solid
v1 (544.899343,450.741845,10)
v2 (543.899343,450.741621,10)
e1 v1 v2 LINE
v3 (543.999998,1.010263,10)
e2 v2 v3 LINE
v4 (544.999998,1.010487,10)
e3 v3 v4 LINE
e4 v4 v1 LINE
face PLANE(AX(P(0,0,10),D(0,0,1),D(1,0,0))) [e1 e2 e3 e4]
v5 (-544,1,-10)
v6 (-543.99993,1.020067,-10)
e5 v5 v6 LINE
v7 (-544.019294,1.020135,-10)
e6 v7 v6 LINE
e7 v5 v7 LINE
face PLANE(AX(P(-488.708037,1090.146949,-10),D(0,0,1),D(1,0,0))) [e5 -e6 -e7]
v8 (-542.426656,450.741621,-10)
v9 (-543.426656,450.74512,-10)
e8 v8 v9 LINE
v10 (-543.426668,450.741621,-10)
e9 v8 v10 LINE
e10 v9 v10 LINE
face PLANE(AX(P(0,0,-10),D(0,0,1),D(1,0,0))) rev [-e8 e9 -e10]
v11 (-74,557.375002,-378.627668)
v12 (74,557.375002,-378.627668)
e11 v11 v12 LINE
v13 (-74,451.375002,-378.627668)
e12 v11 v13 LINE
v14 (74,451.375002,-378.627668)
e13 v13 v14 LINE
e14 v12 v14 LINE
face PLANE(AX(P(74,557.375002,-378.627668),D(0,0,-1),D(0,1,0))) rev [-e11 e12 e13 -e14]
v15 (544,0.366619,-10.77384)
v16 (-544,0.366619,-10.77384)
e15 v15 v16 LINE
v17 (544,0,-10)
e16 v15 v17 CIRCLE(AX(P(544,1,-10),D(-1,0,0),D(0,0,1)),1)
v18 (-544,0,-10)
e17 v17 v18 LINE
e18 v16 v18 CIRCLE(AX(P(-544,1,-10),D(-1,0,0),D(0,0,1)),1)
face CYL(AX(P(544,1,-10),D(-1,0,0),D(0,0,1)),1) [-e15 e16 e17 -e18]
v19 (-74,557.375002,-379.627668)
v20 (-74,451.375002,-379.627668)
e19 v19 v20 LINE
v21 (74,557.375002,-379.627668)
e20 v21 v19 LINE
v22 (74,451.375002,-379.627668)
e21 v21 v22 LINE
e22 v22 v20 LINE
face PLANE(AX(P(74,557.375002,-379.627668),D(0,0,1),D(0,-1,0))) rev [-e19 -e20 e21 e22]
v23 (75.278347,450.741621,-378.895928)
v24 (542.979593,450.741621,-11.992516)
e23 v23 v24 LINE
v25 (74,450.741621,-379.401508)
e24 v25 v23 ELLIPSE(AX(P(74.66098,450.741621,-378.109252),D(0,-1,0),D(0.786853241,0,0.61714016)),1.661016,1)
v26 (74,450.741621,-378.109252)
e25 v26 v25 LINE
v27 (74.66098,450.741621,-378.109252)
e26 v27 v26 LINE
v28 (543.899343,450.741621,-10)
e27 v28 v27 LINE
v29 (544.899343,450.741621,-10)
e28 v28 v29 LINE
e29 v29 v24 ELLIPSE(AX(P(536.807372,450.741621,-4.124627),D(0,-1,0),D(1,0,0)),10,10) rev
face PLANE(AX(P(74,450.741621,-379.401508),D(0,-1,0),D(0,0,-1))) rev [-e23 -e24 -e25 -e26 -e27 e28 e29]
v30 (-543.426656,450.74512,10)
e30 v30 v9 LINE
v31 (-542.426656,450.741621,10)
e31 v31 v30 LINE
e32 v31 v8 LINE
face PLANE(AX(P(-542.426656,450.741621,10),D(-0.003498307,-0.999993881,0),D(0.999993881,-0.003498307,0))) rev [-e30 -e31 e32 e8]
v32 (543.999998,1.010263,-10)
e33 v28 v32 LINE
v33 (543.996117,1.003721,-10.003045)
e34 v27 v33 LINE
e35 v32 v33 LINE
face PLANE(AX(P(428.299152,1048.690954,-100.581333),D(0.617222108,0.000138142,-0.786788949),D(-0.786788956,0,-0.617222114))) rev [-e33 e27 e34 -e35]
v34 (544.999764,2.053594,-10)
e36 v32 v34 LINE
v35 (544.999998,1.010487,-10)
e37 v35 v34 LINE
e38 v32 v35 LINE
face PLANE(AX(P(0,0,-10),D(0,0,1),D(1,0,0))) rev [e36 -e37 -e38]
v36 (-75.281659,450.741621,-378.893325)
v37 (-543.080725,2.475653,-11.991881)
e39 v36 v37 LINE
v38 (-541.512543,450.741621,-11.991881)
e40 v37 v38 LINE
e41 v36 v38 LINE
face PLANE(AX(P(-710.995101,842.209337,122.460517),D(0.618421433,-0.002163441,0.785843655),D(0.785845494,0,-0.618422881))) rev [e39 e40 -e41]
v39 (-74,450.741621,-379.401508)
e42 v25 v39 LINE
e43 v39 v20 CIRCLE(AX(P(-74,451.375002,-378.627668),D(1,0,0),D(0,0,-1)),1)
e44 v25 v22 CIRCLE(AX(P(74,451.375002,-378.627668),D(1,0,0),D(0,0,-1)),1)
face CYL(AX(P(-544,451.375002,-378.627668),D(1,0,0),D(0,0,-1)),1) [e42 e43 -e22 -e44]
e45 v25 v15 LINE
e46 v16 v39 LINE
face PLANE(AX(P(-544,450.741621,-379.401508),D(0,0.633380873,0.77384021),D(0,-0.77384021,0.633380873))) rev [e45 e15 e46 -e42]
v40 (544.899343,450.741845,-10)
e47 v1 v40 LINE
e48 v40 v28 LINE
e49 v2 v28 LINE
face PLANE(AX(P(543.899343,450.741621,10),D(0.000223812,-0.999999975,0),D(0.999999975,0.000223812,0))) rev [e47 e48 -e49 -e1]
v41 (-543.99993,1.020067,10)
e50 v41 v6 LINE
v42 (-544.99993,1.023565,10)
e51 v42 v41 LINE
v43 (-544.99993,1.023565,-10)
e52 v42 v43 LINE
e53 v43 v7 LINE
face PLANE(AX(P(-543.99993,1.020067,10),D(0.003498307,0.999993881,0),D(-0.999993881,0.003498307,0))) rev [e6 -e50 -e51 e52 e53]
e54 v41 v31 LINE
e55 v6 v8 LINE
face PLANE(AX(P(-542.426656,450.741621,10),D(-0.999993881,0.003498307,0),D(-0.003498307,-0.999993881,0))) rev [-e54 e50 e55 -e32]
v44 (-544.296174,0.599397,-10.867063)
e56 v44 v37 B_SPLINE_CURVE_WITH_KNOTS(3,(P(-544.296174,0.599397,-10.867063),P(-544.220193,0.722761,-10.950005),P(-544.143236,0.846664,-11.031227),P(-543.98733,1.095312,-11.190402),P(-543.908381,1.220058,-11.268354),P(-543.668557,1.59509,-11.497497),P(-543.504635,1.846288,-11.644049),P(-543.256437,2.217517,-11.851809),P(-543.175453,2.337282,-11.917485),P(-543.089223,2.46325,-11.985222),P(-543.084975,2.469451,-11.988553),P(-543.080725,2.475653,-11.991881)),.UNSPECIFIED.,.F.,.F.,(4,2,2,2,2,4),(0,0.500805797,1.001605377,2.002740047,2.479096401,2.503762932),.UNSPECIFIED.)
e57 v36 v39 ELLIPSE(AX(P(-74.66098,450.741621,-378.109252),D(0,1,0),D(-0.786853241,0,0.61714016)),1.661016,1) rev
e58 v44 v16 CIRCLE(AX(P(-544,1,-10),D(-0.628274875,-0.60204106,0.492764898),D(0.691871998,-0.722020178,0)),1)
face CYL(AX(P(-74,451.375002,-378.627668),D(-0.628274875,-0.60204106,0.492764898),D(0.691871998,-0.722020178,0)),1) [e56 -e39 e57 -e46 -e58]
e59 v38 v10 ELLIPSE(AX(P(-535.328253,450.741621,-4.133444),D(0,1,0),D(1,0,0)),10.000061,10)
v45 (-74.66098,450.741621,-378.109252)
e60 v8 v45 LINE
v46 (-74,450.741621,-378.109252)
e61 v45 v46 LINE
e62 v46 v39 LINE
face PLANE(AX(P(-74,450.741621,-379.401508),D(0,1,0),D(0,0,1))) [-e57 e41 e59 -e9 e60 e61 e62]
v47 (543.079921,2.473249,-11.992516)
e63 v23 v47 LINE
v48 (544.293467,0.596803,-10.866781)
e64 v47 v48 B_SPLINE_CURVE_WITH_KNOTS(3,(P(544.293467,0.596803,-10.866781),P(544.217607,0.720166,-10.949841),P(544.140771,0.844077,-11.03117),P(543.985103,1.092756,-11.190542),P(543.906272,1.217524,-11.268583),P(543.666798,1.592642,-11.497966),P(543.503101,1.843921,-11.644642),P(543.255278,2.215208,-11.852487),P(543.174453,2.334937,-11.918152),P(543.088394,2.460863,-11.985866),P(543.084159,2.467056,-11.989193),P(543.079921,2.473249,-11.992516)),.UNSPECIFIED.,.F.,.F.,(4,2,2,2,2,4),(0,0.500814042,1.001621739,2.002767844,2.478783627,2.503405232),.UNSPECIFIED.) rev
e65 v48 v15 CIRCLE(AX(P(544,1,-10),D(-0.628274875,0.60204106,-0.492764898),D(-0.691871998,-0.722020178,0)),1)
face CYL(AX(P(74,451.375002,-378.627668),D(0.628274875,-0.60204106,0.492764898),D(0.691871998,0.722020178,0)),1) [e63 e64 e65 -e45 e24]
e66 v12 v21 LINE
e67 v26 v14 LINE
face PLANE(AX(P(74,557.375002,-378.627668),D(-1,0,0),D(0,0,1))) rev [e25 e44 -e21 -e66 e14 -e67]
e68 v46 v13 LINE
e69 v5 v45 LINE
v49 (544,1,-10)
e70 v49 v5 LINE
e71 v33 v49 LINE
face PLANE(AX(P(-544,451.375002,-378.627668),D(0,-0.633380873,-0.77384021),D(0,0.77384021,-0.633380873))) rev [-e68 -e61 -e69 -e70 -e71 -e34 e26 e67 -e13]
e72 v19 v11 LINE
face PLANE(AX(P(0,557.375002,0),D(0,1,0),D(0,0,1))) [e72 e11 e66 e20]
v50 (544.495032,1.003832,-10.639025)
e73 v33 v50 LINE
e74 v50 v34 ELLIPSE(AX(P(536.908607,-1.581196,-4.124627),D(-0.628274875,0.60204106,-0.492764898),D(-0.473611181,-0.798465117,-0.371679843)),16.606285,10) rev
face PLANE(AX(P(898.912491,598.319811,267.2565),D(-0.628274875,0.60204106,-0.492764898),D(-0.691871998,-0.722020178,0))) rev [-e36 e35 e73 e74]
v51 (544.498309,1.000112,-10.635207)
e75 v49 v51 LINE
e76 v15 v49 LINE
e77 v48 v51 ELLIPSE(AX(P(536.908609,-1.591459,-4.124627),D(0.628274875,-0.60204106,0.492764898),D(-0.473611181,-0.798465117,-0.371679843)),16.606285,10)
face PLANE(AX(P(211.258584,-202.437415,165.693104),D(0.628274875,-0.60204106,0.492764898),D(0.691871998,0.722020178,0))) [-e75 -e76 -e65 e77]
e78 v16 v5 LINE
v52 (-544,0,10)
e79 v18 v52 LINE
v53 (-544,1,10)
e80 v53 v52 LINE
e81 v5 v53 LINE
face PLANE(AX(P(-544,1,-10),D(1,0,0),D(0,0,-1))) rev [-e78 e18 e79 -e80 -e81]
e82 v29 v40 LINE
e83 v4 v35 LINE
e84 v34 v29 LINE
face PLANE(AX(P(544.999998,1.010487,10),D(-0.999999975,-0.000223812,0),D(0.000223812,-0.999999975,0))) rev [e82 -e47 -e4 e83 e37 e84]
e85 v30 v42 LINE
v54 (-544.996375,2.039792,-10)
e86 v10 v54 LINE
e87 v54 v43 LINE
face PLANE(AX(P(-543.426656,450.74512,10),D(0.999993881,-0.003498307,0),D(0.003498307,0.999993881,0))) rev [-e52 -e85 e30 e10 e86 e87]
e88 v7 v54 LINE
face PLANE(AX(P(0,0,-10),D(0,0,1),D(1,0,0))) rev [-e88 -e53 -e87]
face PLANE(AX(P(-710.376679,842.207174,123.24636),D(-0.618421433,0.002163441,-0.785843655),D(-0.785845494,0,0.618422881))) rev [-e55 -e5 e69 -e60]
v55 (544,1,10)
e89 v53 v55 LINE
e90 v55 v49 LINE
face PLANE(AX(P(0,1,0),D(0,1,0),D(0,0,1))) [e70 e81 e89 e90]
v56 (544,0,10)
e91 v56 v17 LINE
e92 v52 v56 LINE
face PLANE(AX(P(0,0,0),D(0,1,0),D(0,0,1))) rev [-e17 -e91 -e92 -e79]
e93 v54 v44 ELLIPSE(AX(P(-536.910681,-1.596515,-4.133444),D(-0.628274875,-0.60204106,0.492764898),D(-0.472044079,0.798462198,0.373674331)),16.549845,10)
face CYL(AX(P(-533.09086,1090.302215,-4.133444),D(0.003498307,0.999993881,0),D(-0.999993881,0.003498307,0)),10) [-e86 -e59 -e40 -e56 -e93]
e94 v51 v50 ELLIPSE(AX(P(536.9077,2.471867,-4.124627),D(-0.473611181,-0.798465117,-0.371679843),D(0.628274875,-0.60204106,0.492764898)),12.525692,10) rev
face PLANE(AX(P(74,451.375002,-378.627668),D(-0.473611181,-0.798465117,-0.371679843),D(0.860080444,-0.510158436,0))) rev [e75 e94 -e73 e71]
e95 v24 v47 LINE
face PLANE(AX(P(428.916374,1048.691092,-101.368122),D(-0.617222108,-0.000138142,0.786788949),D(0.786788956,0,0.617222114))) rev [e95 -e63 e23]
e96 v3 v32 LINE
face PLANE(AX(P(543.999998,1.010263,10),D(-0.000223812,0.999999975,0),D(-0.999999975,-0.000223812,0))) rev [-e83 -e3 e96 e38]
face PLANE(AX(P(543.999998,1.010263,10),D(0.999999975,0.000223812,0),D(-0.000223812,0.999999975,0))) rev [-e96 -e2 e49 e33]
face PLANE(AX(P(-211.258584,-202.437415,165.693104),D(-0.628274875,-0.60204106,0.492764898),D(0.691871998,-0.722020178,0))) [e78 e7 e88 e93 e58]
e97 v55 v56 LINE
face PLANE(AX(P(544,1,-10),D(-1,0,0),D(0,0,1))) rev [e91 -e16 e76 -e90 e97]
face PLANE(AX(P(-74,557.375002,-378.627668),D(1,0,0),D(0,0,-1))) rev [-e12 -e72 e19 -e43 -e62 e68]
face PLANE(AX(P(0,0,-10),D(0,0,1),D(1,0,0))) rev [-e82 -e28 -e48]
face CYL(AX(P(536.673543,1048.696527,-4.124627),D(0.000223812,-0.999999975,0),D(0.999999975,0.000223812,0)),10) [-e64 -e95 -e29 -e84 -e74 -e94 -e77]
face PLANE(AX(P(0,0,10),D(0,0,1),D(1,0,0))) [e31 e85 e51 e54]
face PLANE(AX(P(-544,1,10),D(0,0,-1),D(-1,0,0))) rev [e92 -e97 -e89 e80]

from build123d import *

# Parameters (mm, degrees)
SKETCH1_W               = 1088
SKETCH1_H               = 20
BOSS_EXTRUDE1_DEPTH     = 1
BOSS_EXTRUDE4_DEPTH     = 1088
SKETCH5_W               = 1088
SKETCH5_H               = 1
BOSS_EXTRUDE5_DEPTH     = 582
BOSS_EXTRUDE6_DEPTH     = 1088
SKETCH7_W               = 148
SKETCH7_H               = 1
BOSS_EXTRUDE7_DEPTH     = 106
CUT_EXTRUDE3_DEPTH      = 148
SKETCH13_W              = 470
SKETCH13_H              = 1
CUT_REVOLVE1_ANGLE      = 39.3
BOSS_EXTRUDE11_DEPTH    = 748.0802096
BOSS_EXTRUDE12_DEPTH    = 800
SKETCH18_W              = 570.021392147
SKETCH18_H              = 387.152750426
CUT_EXTRUDE5_DEPTH      = 1477.790454702
CUT_EXTRUDE6_DEPTH      = 800
CUT_EXTRUDE6_DEPTH_BACK = 10
BOSS_EXTRUDE13_DEPTH    = 748.0802096
BOSS_EXTRUDE14_DEPTH    = 748.0802096
SKETCH21_W              = 476.858853826
SKETCH21_H              = 325.647229621
CUT_EXTRUDE7_DEPTH      = 1432.718358443
CUT_EXTRUDE9_DEPTH      = 10
CUT_EXTRUDE9_DEPTH_BACK = 946.037072047
BOSS_EXTRUDE15_DEPTH    = 20
FILLET1_R               = 10
BOSS_EXTRUDE20_DEPTH    = 20
FILLET2_R               = 10


with BuildPart() as part:
    # Sketch1 → Boss-Extrude1 (new body)
    with BuildSketch(Plane(origin=(0, 0, 0), x_dir=(1, 0, 0), z_dir=(0, 1, 0))):
        Rectangle(SKETCH1_W, SKETCH1_H)
    extrude(amount=BOSS_EXTRUDE1_DEPTH)

    # Sketch4 → Boss-Extrude4 (add)
    with BuildSketch(Plane.ZY.offset(544)):
        with BuildLine():
            Line((-10, 1), (-10.77384021, 0.366619127))
            ThreePointArc((-10.77384021, 0.366619127), (-10.428146661, 0.096290735), (-10, 0))
            Line((-10, 0), (-10, 1))
        make_face()
    extrude(amount=-BOSS_EXTRUDE4_DEPTH)

    # Sketch5 → Boss-Extrude5 (add)
    with BuildSketch(Plane(origin=(0, 5.500184543, -4.501848885), x_dir=(1, 0, 0), z_dir=(0, 0.7738402097265025, -0.6333808726275548))):
        with Locations((0, 7.605021225)):
            Rectangle(SKETCH5_W, SKETCH5_H)
    extrude(amount=BOSS_EXTRUDE5_DEPTH)

    # Sketch6 → Boss-Extrude6 (add)
    with BuildSketch(Plane(origin=(544, 0, 0), x_dir=(0, 0, -1), z_dir=(1, 0, 0))):
        with BuildLine():
            Line((378.627667869, 451.375002061), (379.627667869, 451.375002061))
            ThreePointArc((379.627667869, 451.375002061), (379.569432227, 451.038728519), (379.401508079, 450.741621188))
            Line((379.401508079, 450.741621188), (378.627667869, 451.375002061))
        make_face()
    extrude(amount=-BOSS_EXTRUDE6_DEPTH)

    # Sketch7 → Boss-Extrude7 (add)
    with BuildSketch(Plane(origin=(0, 451.375002061, 0), x_dir=(1, 0, 0), z_dir=(0, 1, 0))):
        with Locations((0, 379.127667869)):
            Rectangle(SKETCH7_W, SKETCH7_H)
    extrude(amount=BOSS_EXTRUDE7_DEPTH)

    # Sketch8 → Cut-Extrude3 (cut)
    with BuildSketch(Plane(origin=(0, -4.500184543, -5.498151115), x_dir=(1, 0, 0), z_dir=(0, 0.6333808726275547, 0.7738402097265025))):
        Polygon((74, 589.107648936), (544, 7.107648936), (544, 589.107648936), align=None)
        Polygon((-74, 589.107648936), (-544, 7.107648936), (-544, 589.107648936), align=None)
    extrude(amount=-CUT_EXTRUDE3_DEPTH, mode=Mode.SUBTRACT)

    # Sketch13 → Cut-Revolve1 (revolve, cut)
    with BuildSketch(Plane(origin=(0, 451.375002061, 0), x_dir=(1, 0, 0), z_dir=(0, 1, 0))):
        with Locations((309, 379.127667869)):
            Rectangle(SKETCH13_W, SKETCH13_H)
        with Locations((-309, 379.127667869)):
            Rectangle(SKETCH13_W, SKETCH13_H)
    revolve(axis=Axis((-544, 451.375002061, -378.627667869), (-1, 0, 0)), revolution_arc=CUT_REVOLVE1_ANGLE, mode=Mode.SUBTRACT)

    # 3DSketch8 → Boss-Extrude11 (add)
    with BuildSketch(Plane(origin=(-74, 450.741621188, -379.401508079), x_dir=(0, 0.6333808726023494, 0.7738402097471327), z_dir=(-0.6282748747614416, -0.602041059623436, 0.49276489756372194))):
        with BuildLine():
            Line((0, 0), (1, 0))
            Line((1, 0), (0.393252863, 0.794894906))
            ThreePointArc((0.393252863, 0.794894906), (0.103688911, 0.443425791), (0, 0))
        make_face()
    extrude(amount=BOSS_EXTRUDE11_DEPTH)

    # Sketch17 → Boss-Extrude12 (add)
    with BuildSketch(Plane(origin=(-119.830134924, 202.692581564, 94.858610661), x_dir=(0.8810391406721232, 0.4420570737301439, 0.16839114041085765), z_dir=(-0.4720440788324485, 0.7984621982715473, 0.37367433089602736))):
        Polygon((69.885181219, 532.84001368), (70.561407095, 532.10331933), (70.579071373, 532.119533725), (69.90284514, 532.856227747), align=None)
        Polygon((-481.203373087, 26.984765587), (-480.527146854, 26.248071566), (70.561407095, 532.10331933), (69.885181219, 532.84001368), align=None)
    extrude(amount=BOSS_EXTRUDE12_DEPTH)

    # Sketch18 → Cut-Extrude5 (cut, through all)
    with BuildSketch(Plane(origin=(0, 1, 0), x_dir=(1, 0, 0), z_dir=(0, 1, 0))):
        with Locations((-773.718733555, -183.576375213)):
            Rectangle(SKETCH18_W, SKETCH18_H)
    extrude(amount=CUT_EXTRUDE5_DEPTH, mode=Mode.SUBTRACT)

    # 3DSketch9 → Cut-Extrude6 (cut, two sides: drawn at the far end of the back side and taken through both)
    with BuildSketch(Plane(origin=(-74, 450.741621188, -379.401508079), x_dir=(-0.7561274717373775, 0.6544243626913974, 3.634948491477008e-14), z_dir=(0, 0, 1)).offset(-CUT_EXTRUDE6_DEPTH_BACK)):
        Polygon((0, 0), (591.099614486, 511.59361742), (1033.881208267, 0), (442.781593781, -511.59361742), align=None)
    extrude(amount=CUT_EXTRUDE6_DEPTH + CUT_EXTRUDE6_DEPTH_BACK, mode=Mode.SUBTRACT)

    # 3DSketch11 → Boss-Extrude13 (add)
    with BuildSketch(Plane(origin=(74, 450.741621188, -379.401508079), x_dir=(0, 0.6333808726276229, 0.7738402097264466), z_dir=(-0.6282748747614613, 0.60204105960733, -0.4927648975833744))):
        with BuildLine():
            Line((0, 0), (1, 0))
            Line((1, 0), (0.391238571, 0.79335334))
            ThreePointArc((0.391238571, 0.79335334), (0.103127258, 0.44228869), (0, 0))
        make_face()
    extrude(amount=-BOSS_EXTRUDE13_DEPTH)

    # Sketch20 → Boss-Extrude14 (add)
    with BuildSketch(Plane(origin=(120.641152421, 203.389944625, 94.67657513), x_dir=(0.8807290157776859, -0.4307943838243474, -0.19680599491039222), z_dir=(0.47361118117402395, 0.7984651172491827, 0.37167984287985667))):
        Polygon((-54.061283152, 534.279462102), (-54.759673843, 533.563745369), (480.649426942, 11.115806908), (481.347817633, 11.831523641), align=None)
    extrude(amount=BOSS_EXTRUDE14_DEPTH)

    # Sketch21 → Cut-Extrude7 (cut, through all)
    with BuildSketch(Plane(origin=(0, 1, 0), x_dir=(1, 0, 0), z_dir=(0, 1, 0))):
        with Locations((750.93268392, -152.823614809)):
            Rectangle(SKETCH21_W, SKETCH21_H)
    extrude(amount=CUT_EXTRUDE7_DEPTH, mode=Mode.SUBTRACT)

    # 3DSketch12 → Cut-Extrude9 (cut, two sides: drawn at the far end of the back side and taken through both)
    with BuildSketch(Plane(origin=(74, 450.741621188, -379.401508079), x_dir=(0.7338585271859536, 0.6793023348086353, 3.7729204364225037e-14), z_dir=(0, 0, -1)).offset(-CUT_EXTRUDE9_DEPTH_BACK)):
        Polygon((0, 0), (611.708587654, 566.233213109), (1135.847136792, 0), (524.138549137, -566.233213109), align=None)
    extrude(amount=CUT_EXTRUDE9_DEPTH + CUT_EXTRUDE9_DEPTH_BACK, mode=Mode.SUBTRACT)

    # Sketch23 → Boss-Extrude15 (add)
    with BuildSketch(Plane.XY.offset(-10.000000002)):
        Polygon((543.999997701, 1.01026286), (543.899342545, 450.741621188), (544.899342545, 450.741845), (544.999997701, 1.010486671), align=None)
    extrude(amount=BOSS_EXTRUDE15_DEPTH)

    # Fillet1
    # the kernel refuses this fillet: 10 mm, written as the material it takes off along each edge
    with BuildSketch(Plane(origin=(545.517698589, 458.812119138, -10.000000002), x_dir=(-0.7867889291912172, -0.0001760925956154425, -0.6172221236261185), z_dir=(0.00022381172976857925, -0.9999999749541545, 0))) as fillet1_piece_1:
        with BuildLine():
            CenterArc((3.228199261, -10), FILLET1_R, 90, 15.90399317)
            Line((0.487936805, -0.382777861), (0, 0))
            Line((0, 0), (3.228199261, 0))
        make_face()
    extrude(amount=464.182000108, mode=Mode.SUBTRACT)

    # Sketch26 → Boss-Extrude20 (add)
    with BuildSketch(Plane.XY.offset(-10)):
        Polygon((-542.426656099, 450.741621188), (-543.999929799, 1.020067072), (-544.999929799, 1.023565401), (-543.426656099, 450.745119517), align=None)
    extrude(amount=BOSS_EXTRUDE20_DEPTH)

    # Fillet2
    # the kernel refuses this fillet: 10 mm, written as the material it takes off along each edge
    with BuildSketch(Plane(origin=(-544.015507205, 458.793802403, -10), x_dir=(0.7858388463706936, -0.0027491223803662495, -0.618425217678674), z_dir=(-0.003498307026844443, -0.9999938809052514, 0))) as fillet2_piece_1:
        with BuildLine():
            CenterArc((3.220892195, 10), FILLET2_R, 254.121260496, 15.878739504)
            Line((0.484868888, 0.381570998), (0, 0))
            Line((0, 0), (3.220892195, 0))
        make_face()
    extrude(amount=464.167480485, mode=Mode.SUBTRACT)


solid = part.part
